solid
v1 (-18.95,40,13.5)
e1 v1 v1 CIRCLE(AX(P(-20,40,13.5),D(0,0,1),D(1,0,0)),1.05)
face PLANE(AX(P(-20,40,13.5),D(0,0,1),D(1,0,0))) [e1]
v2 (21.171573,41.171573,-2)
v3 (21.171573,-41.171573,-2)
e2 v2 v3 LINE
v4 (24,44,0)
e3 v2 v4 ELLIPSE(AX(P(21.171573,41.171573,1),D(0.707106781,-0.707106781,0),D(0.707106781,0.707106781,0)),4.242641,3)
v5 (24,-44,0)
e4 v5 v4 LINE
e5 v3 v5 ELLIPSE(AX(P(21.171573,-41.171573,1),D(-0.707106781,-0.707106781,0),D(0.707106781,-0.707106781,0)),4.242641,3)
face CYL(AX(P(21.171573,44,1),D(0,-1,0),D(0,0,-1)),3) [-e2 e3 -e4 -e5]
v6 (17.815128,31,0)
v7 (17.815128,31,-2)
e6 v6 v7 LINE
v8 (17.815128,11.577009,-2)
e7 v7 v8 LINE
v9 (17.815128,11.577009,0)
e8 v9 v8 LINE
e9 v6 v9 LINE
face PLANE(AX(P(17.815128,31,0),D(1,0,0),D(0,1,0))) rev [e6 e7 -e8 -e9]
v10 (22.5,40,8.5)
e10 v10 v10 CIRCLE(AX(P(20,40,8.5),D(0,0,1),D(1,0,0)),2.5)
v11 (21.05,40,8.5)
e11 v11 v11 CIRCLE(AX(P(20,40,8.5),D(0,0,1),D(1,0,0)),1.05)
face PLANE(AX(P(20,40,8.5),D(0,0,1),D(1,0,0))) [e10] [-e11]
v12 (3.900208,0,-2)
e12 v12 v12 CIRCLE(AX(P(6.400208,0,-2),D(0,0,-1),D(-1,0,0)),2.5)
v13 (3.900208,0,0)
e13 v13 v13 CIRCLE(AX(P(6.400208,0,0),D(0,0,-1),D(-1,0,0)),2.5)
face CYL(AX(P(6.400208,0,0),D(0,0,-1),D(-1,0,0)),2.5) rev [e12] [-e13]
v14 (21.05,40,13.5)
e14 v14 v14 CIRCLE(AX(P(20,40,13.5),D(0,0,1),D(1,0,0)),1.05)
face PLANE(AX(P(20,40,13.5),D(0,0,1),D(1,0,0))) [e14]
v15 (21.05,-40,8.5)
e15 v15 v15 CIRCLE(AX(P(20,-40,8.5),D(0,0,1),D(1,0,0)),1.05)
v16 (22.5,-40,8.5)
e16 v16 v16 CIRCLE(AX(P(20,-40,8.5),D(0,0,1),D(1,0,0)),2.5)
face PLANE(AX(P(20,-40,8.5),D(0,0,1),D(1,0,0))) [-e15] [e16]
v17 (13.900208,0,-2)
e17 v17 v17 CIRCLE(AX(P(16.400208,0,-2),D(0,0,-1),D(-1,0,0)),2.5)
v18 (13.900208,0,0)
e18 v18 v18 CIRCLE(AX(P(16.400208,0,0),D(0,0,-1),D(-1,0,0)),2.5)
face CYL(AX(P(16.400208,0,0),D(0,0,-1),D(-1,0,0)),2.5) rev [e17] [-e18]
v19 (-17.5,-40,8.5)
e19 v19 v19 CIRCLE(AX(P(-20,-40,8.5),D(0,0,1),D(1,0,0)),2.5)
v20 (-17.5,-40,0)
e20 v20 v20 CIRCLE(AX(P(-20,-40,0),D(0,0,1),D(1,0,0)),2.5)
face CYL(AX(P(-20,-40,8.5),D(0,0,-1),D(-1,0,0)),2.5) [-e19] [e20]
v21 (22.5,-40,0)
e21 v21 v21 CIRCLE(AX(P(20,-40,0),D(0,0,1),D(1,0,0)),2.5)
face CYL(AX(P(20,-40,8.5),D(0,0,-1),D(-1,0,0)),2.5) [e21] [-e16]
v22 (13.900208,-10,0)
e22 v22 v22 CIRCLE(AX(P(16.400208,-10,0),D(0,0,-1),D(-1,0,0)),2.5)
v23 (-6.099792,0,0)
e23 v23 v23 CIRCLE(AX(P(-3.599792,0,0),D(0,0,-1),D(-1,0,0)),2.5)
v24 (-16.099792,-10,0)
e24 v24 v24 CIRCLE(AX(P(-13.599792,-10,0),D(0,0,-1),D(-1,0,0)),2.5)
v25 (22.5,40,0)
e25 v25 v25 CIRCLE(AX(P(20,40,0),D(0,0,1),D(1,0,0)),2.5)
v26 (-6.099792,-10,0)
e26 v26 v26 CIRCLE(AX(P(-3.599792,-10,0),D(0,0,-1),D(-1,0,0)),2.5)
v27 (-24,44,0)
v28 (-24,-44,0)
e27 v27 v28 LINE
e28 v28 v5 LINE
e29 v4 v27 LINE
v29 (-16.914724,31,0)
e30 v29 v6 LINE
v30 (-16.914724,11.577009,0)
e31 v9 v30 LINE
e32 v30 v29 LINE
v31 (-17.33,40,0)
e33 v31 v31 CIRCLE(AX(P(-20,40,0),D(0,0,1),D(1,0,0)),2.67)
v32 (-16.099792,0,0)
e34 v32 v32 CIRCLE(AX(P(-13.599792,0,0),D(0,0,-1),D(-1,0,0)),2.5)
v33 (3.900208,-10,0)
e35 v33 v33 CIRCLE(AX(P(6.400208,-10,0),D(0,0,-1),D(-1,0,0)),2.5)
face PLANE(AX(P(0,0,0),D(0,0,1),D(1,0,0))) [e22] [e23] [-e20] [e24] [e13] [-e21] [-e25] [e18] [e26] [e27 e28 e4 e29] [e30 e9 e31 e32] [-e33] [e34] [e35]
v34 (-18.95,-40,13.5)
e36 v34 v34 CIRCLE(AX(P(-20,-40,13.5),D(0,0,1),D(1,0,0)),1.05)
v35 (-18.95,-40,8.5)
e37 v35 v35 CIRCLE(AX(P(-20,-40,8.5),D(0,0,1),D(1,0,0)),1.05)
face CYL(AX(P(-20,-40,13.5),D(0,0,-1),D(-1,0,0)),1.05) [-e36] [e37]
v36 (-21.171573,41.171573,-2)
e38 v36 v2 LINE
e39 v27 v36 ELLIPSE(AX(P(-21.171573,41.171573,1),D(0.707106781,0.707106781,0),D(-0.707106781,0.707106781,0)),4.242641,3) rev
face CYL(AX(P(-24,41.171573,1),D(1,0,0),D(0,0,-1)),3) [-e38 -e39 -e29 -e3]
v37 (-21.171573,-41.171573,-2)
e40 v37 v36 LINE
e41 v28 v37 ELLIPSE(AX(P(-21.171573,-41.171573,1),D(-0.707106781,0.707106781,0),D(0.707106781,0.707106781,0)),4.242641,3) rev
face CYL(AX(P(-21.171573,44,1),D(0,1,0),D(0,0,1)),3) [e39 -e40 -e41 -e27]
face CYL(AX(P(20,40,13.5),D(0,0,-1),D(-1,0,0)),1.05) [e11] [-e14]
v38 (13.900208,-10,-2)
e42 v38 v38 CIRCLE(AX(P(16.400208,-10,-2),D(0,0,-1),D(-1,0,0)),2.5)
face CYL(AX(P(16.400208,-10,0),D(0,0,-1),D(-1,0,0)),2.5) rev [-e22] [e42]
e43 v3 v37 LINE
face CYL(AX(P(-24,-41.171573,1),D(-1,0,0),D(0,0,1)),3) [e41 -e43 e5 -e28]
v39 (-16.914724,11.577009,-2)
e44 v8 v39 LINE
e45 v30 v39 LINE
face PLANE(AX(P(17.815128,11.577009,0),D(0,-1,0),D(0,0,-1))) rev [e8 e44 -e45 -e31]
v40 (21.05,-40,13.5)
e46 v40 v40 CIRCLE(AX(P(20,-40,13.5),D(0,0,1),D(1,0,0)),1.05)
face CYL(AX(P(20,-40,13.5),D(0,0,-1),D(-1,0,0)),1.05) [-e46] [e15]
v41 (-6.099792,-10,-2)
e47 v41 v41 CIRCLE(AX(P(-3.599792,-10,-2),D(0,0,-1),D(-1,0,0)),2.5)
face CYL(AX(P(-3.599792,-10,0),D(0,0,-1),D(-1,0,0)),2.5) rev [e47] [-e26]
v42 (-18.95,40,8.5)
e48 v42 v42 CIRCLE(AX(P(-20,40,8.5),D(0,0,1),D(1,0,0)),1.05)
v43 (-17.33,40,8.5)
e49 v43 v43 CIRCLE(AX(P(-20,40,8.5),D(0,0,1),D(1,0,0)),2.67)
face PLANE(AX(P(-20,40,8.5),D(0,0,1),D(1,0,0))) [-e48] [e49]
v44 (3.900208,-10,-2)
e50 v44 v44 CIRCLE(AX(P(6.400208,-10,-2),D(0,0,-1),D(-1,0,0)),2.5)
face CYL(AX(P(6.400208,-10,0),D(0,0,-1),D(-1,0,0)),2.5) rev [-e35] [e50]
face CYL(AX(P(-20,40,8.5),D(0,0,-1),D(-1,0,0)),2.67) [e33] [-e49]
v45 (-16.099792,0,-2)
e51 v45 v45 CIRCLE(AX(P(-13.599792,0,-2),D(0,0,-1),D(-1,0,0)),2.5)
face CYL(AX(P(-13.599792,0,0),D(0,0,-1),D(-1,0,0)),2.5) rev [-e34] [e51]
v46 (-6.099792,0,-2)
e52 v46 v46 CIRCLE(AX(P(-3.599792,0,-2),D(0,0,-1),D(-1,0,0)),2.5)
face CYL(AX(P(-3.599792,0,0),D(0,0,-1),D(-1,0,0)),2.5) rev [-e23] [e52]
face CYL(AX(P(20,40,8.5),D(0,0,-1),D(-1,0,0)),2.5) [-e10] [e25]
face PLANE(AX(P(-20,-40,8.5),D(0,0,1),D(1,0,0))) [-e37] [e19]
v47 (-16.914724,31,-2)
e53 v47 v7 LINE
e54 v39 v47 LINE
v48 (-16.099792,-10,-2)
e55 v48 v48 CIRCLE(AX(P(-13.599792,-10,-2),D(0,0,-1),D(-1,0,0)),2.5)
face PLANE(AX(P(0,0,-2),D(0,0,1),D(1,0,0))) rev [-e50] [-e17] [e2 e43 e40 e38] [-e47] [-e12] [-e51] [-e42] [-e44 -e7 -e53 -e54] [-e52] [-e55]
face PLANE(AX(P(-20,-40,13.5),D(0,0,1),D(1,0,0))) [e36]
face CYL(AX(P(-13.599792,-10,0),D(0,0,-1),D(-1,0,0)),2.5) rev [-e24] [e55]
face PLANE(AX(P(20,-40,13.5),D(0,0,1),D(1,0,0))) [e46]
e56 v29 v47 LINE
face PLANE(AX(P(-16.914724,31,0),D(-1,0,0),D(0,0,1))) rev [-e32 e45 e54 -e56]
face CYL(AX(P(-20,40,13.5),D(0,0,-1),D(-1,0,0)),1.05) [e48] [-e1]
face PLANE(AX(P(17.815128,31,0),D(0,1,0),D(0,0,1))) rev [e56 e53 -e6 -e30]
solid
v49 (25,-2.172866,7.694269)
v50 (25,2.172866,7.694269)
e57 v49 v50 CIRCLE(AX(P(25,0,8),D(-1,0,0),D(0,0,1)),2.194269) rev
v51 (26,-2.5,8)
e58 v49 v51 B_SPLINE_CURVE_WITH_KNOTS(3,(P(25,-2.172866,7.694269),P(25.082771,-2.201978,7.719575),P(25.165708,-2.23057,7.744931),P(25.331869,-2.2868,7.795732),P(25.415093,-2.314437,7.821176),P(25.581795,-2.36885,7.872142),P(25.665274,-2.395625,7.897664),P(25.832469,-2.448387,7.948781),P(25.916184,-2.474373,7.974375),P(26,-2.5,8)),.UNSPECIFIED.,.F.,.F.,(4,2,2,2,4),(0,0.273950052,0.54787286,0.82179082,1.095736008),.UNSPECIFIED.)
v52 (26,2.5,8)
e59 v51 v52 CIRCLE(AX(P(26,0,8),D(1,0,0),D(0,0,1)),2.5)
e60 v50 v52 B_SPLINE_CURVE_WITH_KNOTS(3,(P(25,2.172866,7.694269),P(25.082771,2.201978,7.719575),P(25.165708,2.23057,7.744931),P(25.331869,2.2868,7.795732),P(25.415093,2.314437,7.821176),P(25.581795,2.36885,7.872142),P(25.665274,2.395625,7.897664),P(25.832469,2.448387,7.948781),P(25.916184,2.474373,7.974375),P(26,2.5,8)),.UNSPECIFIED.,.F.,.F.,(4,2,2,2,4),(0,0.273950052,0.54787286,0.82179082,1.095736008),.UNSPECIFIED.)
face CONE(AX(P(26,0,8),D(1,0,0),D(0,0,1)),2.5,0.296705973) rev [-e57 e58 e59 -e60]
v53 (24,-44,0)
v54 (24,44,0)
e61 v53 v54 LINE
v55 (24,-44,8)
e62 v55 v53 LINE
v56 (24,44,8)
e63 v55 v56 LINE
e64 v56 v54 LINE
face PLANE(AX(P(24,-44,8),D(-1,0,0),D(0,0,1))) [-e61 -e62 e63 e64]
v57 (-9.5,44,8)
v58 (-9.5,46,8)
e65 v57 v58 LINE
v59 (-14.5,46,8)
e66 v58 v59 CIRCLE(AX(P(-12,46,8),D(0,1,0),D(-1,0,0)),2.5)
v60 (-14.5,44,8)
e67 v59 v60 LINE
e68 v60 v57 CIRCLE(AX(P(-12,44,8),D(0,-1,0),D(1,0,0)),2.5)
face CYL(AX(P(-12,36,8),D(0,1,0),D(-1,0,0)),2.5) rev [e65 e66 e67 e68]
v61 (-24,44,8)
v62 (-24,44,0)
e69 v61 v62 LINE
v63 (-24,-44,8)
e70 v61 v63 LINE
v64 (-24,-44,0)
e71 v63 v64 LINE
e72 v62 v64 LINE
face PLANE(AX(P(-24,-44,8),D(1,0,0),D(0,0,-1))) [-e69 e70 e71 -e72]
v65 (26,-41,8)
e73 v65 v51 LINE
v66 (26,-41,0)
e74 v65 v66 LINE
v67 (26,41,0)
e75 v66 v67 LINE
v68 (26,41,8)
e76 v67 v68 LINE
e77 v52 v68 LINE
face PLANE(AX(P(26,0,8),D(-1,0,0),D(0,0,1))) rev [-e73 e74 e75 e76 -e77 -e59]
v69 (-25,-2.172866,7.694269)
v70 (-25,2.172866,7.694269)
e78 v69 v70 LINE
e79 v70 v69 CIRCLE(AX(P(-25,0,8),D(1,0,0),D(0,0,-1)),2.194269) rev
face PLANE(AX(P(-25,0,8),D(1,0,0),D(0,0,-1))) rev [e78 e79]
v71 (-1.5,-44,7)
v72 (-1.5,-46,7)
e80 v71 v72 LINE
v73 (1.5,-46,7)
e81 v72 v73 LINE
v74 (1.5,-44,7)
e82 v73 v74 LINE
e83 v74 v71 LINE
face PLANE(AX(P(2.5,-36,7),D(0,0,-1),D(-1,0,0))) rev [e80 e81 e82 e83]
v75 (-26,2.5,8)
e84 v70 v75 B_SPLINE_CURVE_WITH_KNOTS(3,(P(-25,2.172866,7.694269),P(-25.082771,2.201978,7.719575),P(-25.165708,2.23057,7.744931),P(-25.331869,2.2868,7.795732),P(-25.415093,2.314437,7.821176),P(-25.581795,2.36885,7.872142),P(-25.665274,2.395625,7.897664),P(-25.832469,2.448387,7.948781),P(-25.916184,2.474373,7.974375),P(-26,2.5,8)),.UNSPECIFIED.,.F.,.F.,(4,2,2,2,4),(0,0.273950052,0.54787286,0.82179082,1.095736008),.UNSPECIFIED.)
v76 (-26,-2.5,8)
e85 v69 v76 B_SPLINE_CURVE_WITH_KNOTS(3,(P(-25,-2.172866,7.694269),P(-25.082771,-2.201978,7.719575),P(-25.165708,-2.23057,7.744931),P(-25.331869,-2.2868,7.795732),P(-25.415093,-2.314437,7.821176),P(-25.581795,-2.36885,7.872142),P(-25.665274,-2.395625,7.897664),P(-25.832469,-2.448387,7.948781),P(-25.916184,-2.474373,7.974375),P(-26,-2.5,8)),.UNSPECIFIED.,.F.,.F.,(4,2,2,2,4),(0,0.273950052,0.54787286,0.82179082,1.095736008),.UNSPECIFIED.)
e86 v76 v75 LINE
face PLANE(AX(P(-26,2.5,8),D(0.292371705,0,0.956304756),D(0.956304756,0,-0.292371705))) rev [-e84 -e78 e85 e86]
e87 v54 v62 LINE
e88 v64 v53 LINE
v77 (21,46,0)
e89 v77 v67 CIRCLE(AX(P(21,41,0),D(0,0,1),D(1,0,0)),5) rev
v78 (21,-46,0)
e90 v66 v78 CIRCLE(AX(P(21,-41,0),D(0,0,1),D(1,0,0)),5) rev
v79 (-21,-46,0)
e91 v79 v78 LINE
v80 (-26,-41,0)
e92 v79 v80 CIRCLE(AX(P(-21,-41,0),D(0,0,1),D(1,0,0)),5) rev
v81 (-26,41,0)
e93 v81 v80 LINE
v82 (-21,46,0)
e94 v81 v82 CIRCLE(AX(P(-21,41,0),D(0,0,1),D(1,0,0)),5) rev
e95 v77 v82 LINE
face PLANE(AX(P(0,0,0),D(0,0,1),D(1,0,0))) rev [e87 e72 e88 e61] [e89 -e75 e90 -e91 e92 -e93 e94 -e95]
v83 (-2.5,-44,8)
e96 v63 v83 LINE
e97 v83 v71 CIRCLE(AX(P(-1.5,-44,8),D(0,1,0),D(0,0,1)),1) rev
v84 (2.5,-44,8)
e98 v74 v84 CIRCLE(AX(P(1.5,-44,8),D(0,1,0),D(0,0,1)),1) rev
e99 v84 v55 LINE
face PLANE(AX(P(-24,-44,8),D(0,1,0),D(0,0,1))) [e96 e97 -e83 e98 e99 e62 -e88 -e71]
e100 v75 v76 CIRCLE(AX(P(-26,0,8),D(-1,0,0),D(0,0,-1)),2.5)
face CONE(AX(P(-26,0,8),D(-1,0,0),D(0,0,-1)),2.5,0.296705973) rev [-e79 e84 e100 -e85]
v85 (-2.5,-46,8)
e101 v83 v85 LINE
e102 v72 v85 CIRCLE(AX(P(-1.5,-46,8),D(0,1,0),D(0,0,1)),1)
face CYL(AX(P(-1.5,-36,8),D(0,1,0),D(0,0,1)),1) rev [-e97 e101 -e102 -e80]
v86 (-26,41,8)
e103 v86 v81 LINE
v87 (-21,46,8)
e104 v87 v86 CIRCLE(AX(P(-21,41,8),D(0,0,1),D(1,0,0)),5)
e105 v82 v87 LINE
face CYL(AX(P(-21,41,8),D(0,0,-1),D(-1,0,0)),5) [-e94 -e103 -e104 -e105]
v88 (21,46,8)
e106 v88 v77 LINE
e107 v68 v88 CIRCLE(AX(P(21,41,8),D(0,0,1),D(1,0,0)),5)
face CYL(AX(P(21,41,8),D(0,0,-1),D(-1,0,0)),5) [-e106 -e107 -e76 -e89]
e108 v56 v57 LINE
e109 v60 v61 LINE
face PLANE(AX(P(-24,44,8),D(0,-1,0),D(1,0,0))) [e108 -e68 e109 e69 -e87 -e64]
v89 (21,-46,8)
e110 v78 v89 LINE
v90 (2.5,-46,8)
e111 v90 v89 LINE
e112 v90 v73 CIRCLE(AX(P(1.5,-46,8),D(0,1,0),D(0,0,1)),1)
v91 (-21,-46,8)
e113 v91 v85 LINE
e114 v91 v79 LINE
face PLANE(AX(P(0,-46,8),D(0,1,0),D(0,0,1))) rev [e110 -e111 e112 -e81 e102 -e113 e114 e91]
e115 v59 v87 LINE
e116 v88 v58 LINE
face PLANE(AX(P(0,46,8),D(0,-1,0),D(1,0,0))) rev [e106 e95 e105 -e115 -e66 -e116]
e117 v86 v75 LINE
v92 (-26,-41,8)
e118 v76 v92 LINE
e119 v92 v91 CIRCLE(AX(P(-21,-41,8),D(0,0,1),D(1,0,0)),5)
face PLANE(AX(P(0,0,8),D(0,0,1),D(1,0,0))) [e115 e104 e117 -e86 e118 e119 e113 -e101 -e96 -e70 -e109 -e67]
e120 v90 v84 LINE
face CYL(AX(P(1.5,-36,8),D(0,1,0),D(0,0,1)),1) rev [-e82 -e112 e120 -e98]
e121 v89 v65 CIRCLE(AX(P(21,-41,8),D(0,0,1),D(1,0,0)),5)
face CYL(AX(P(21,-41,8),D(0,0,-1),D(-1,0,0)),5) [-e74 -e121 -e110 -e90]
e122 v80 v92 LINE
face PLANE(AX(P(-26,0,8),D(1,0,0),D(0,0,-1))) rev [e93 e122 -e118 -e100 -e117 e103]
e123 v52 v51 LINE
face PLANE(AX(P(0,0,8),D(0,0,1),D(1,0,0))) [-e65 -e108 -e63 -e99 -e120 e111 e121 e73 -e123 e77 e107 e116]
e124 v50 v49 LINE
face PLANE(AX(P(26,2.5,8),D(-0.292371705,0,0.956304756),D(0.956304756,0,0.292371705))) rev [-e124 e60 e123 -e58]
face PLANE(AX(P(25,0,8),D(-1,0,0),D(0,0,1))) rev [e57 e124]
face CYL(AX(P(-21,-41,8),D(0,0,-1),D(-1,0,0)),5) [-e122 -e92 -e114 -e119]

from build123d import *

# Parameters (mm, degrees)
SKETCH1_W           = 52
SKETCH1_H           = 92
SKETCH1_W_2         = 48
SKETCH1_H_2         = 88
EXTRUDE_THIN1_DEPTH = 8
SKETCH2_W           = 48
SKETCH2_H           = 88
BOSS_EXTRUDE1_DEPTH = 2
SKETCH4_W           = 34.729851986
SKETCH4_H           = 19.422991295
CUT_EXTRUDE1_DEPTH  = 2
SKETCH5_R           = 2.5
CUT_EXTRUDE2_DEPTH  = 2
FILLET2_R           = 5
SKETCH6_R           = 1.05
BOSS_EXTRUDE2_DEPTH = 13.5
SKETCH7_R           = 2.67
SKETCH7_R_2         = 1.05
SKETCH7_R_3         = 2.5
SKETCH7_R_4         = 0.991419058
BOSS_EXTRUDE3_DEPTH = 8.5
FILLET3_R           = 3
SKETCH8_R           = 2.5
CUT_EXTRUDE3_DEPTH  = 10
SKETCH9_W           = 5
SKETCH9_H           = 2
CUT_EXTRUDE4_DEPTH  = 10
FILLET4_R           = 1
CUT_EXTRUDE5_DEPTH  = 1
CUT_EXTRUDE5_DRAFT  = -17
CUT_EXTRUDE6_DEPTH  = 1
CUT_EXTRUDE6_DRAFT  = -17


# Some blends are built 0.0001 mm under size
with BuildPart() as part:
    # Sketch1 → Extrude-Thin1 (new body)
    with BuildSketch(Plane.XY):
        Rectangle(SKETCH1_W, SKETCH1_H)
        Rectangle(SKETCH1_W_2, SKETCH1_H_2, mode=Mode.SUBTRACT)
    extrude(amount=EXTRUDE_THIN1_DEPTH)

    # Fillet2
    fillet2_edges = [part.edges().sort_by_distance(p)[0] for p in [
        (26, -46, 4),
        (-26, -46, 4),
        (-26, 46, 4),
        (26, 46, 4),
    ]]
    fillet(fillet2_edges, radius=FILLET2_R)

    # Sketch8 → Cut-Extrude3 (cut)
    with BuildSketch(Plane(origin=(0, 46, 0), x_dir=(1, 0, 0), z_dir=(0, 1, 0))):
        with Locations((-12, -8)):
            Circle(SKETCH8_R)
    extrude(amount=-CUT_EXTRUDE3_DEPTH, mode=Mode.SUBTRACT)

    # Sketch9 → Cut-Extrude4 (cut)
    with BuildSketch(Plane.XZ.offset(46)):
        with Locations((0, 8)):
            Rectangle(SKETCH9_W, SKETCH9_H)
    extrude(amount=-CUT_EXTRUDE4_DEPTH, mode=Mode.SUBTRACT)

    # Fillet4
    fillet4_edges = [part.edges().sort_by_distance(p)[0] for p in [
        (-2.5, -45, 7),
        (2.5, -45, 7),
    ]]
    fillet(fillet4_edges, radius=FILLET4_R - 0.0001)  # a hair under: the kernel refuses the full size


with BuildPart() as body_2:
    # Sketch2 → Boss-Extrude1 (new body)
    with BuildSketch(Plane.XY):
        Rectangle(SKETCH2_W, SKETCH2_H)
    extrude(amount=-BOSS_EXTRUDE1_DEPTH)

    # Sketch4 → Cut-Extrude1 (cut)
    with BuildSketch(Plane(origin=(0, 0, -2), x_dir=(-1, 0, 0), z_dir=(0, 0, -1))):
        with Locations((-0.450201785, 21.288504353)):
            Rectangle(SKETCH4_W, SKETCH4_H)
    extrude(amount=-CUT_EXTRUDE1_DEPTH, mode=Mode.SUBTRACT)

    # Sketch5 → Cut-Extrude2 (cut)
    with BuildSketch(Plane(origin=(0, 0, -2), x_dir=(-1, 0, 0), z_dir=(0, 0, -1))):
        with Locations((-16.400207882, 0)):
            Circle(SKETCH5_R)
        with Locations((-6.400207882, 0)):
            Circle(SKETCH5_R)
        with Locations((3.599792118, 0)):
            Circle(SKETCH5_R)
        with Locations((13.599792118, 0)):
            Circle(SKETCH5_R)
        with Locations((-6.400207882, -10)):
            Circle(SKETCH5_R)
        with Locations((3.599792118, -10)):
            Circle(SKETCH5_R)
        with Locations((13.599792118, -10)):
            Circle(SKETCH5_R)
        with Locations((-16.400207882, -10)):
            Circle(SKETCH5_R)
    extrude(amount=-CUT_EXTRUDE2_DEPTH, mode=Mode.SUBTRACT)

    # Sketch6 → Boss-Extrude2 (add)
    with BuildSketch(Plane.XY):
        with Locations((-20, 40)):
            Circle(SKETCH6_R)
        with Locations((-20, -40)):
            Circle(SKETCH6_R)
        with Locations((20, 40)):
            Circle(SKETCH6_R)
        with Locations((20, -40)):
            Circle(SKETCH6_R)
    extrude(amount=BOSS_EXTRUDE2_DEPTH)

    # Sketch7 → Boss-Extrude3 (add)
    # profile 1 of 4: a face of its own
    with BuildSketch(Plane.XY):
        with Locations((-20, 40)):
            Circle(SKETCH7_R)
        with Locations((-20, 40)):
            Circle(SKETCH7_R_2, mode=Mode.SUBTRACT)
    # profile 2 of 4: a face of its own
    with BuildSketch(Plane.XY):
        with Locations((20, 40)):
            Circle(SKETCH7_R_3)
        with Locations((20, 40)):
            Circle(SKETCH7_R_2, mode=Mode.SUBTRACT)
    # profile 3 of 4: a face of its own
    with BuildSketch(Plane.XY):
        with Locations((-20, -40)):
            Circle(SKETCH7_R_3)
        with Locations((-20, -40)):
            Circle(SKETCH7_R_2, mode=Mode.SUBTRACT)
    # profile 4 of 4: a face of its own
    with BuildSketch(Plane.XY):
        with Locations((20, -40)):
            Circle(SKETCH7_R_3)
        with Locations((20, -40)):
            Circle(SKETCH7_R_4, mode=Mode.SUBTRACT)
    extrude(amount=BOSS_EXTRUDE3_DEPTH)

    # Fillet3
    # the kernel refuses this fillet: 3 mm, written as the material it takes off along each edge
    with BuildSketch(Plane(origin=(31.071067812, -44, -2), x_dir=(0, 1, 0), z_dir=(-1, 0, 0))) as fillet3_piece_1:
        with BuildLine():
            CenterArc((2.828427125, -3), FILLET3_R, 90, 70.528779366)
            Line((0, -2), (-0.056568542, -1.98))
            ThreePointArc((-0.056568542, -1.98), (-0.06, -1), (-0.06, 0))
            Line((-0.06, 0), (0, 0.06))
            Line((0, 0.06), (2.828427125, 0.06))
            Line((2.828427125, 0.06), (2.828427125, 0))
        make_face()
    extrude(amount=62.142135624, mode=Mode.SUBTRACT)
    with BuildSketch(Plane(origin=(24, 51.071067812, -2), x_dir=(0, 0, 1), z_dir=(0, -1, 0)), Plane(origin=(-24, -51.071067812, -2), x_dir=(0, 0, 1), z_dir=(0, 1, 0))) as fillet3_piece_2:
        with BuildLine():
            CenterArc((3, 2.828427125), FILLET3_R, 180, 70.528779366)
            Line((0, 2.828427125), (-0.06, 2.828427125))
            Line((-0.06, 2.828427125), (-0.06, 0))
            Line((-0.06, 0), (0, -0.06))
            ThreePointArc((0, -0.06), (1, -0.06), (1.98, -0.056568542))
            Line((1.98, -0.056568542), (2, 0))
        make_face()
    extrude(amount=102.142135624, mode=Mode.SUBTRACT)
    with BuildSketch(Plane(origin=(-31.071067812, 44, -2), x_dir=(0, 0, 1), z_dir=(1, 0, 0))) as fillet3_piece_3:
        with BuildLine():
            CenterArc((3, 2.828427125), FILLET3_R, 180, 70.528779366)
            Line((0, 2.828427125), (-0.06, 2.828427125))
            Line((-0.06, 2.828427125), (-0.06, 0))
            Line((-0.06, 0), (0, -0.06))
            ThreePointArc((0, -0.06), (1, -0.06), (1.98, -0.056568542))
            Line((1.98, -0.056568542), (2, 0))
        make_face()
    extrude(amount=62.142135624, mode=Mode.SUBTRACT)


with BuildPart() as cut_extrude5_tool:
    # Sketch10 → Cut-Extrude5 (with draft: the straight prism first)
    with BuildSketch(Plane.ZY.offset(26)):
        with BuildLine():
            ThreePointArc((8, 2.5), (5.5, 0), (8, -2.5))
            Line((8, -2.5), (8, 2.5))
        make_face()
    extrude(amount=-CUT_EXTRUDE5_DEPTH)
    # Cut-Extrude5: the draft: its side faces are tilted about the plane it starts from
    cut_extrude5_sides = [cut_extrude5_tool.faces().sort_by_distance(p)[0] for p in [
        (-25.5, 0, 5.5),
        (-25.5, 0, 8),
    ]]
    draft(cut_extrude5_sides, Plane.ZY.offset(26), CUT_EXTRUDE5_DRAFT)


with BuildPart() as part_1:
    add(part.part)

    # Cut-Extrude5: cut by cut_extrude5_tool
    add(cut_extrude5_tool.part, mode=Mode.SUBTRACT)


with BuildPart() as cut_extrude6_tool:
    # Sketch11 → Cut-Extrude6 (with draft: the straight prism first)
    with BuildSketch(Plane(origin=(26, 0, 0), x_dir=(0, 0, -1), z_dir=(1, 0, 0))):
        with BuildLine():
            Line((-8, 2.5), (-8, -2.5))
            ThreePointArc((-8, -2.5), (-5.5, 0), (-8, 2.5))
        make_face()
    extrude(amount=-CUT_EXTRUDE6_DEPTH)
    # Cut-Extrude6: the draft: its side faces are tilted about the plane it starts from
    cut_extrude6_sides = [cut_extrude6_tool.faces().sort_by_distance(p)[0] for p in [
        (25.5, 0, 8),
        (25.5, 0, 5.5),
    ]]
    draft(cut_extrude6_sides, Plane(origin=(26, 0, 0), x_dir=(0, 0, -1), z_dir=(1, 0, 0)), CUT_EXTRUDE6_DRAFT)


with BuildPart() as part_2:
    add(part_1.part)

    # Cut-Extrude6: cut by cut_extrude6_tool
    add(cut_extrude6_tool.part, mode=Mode.SUBTRACT)


solid = Compound([body_2.part, part_2.part])
